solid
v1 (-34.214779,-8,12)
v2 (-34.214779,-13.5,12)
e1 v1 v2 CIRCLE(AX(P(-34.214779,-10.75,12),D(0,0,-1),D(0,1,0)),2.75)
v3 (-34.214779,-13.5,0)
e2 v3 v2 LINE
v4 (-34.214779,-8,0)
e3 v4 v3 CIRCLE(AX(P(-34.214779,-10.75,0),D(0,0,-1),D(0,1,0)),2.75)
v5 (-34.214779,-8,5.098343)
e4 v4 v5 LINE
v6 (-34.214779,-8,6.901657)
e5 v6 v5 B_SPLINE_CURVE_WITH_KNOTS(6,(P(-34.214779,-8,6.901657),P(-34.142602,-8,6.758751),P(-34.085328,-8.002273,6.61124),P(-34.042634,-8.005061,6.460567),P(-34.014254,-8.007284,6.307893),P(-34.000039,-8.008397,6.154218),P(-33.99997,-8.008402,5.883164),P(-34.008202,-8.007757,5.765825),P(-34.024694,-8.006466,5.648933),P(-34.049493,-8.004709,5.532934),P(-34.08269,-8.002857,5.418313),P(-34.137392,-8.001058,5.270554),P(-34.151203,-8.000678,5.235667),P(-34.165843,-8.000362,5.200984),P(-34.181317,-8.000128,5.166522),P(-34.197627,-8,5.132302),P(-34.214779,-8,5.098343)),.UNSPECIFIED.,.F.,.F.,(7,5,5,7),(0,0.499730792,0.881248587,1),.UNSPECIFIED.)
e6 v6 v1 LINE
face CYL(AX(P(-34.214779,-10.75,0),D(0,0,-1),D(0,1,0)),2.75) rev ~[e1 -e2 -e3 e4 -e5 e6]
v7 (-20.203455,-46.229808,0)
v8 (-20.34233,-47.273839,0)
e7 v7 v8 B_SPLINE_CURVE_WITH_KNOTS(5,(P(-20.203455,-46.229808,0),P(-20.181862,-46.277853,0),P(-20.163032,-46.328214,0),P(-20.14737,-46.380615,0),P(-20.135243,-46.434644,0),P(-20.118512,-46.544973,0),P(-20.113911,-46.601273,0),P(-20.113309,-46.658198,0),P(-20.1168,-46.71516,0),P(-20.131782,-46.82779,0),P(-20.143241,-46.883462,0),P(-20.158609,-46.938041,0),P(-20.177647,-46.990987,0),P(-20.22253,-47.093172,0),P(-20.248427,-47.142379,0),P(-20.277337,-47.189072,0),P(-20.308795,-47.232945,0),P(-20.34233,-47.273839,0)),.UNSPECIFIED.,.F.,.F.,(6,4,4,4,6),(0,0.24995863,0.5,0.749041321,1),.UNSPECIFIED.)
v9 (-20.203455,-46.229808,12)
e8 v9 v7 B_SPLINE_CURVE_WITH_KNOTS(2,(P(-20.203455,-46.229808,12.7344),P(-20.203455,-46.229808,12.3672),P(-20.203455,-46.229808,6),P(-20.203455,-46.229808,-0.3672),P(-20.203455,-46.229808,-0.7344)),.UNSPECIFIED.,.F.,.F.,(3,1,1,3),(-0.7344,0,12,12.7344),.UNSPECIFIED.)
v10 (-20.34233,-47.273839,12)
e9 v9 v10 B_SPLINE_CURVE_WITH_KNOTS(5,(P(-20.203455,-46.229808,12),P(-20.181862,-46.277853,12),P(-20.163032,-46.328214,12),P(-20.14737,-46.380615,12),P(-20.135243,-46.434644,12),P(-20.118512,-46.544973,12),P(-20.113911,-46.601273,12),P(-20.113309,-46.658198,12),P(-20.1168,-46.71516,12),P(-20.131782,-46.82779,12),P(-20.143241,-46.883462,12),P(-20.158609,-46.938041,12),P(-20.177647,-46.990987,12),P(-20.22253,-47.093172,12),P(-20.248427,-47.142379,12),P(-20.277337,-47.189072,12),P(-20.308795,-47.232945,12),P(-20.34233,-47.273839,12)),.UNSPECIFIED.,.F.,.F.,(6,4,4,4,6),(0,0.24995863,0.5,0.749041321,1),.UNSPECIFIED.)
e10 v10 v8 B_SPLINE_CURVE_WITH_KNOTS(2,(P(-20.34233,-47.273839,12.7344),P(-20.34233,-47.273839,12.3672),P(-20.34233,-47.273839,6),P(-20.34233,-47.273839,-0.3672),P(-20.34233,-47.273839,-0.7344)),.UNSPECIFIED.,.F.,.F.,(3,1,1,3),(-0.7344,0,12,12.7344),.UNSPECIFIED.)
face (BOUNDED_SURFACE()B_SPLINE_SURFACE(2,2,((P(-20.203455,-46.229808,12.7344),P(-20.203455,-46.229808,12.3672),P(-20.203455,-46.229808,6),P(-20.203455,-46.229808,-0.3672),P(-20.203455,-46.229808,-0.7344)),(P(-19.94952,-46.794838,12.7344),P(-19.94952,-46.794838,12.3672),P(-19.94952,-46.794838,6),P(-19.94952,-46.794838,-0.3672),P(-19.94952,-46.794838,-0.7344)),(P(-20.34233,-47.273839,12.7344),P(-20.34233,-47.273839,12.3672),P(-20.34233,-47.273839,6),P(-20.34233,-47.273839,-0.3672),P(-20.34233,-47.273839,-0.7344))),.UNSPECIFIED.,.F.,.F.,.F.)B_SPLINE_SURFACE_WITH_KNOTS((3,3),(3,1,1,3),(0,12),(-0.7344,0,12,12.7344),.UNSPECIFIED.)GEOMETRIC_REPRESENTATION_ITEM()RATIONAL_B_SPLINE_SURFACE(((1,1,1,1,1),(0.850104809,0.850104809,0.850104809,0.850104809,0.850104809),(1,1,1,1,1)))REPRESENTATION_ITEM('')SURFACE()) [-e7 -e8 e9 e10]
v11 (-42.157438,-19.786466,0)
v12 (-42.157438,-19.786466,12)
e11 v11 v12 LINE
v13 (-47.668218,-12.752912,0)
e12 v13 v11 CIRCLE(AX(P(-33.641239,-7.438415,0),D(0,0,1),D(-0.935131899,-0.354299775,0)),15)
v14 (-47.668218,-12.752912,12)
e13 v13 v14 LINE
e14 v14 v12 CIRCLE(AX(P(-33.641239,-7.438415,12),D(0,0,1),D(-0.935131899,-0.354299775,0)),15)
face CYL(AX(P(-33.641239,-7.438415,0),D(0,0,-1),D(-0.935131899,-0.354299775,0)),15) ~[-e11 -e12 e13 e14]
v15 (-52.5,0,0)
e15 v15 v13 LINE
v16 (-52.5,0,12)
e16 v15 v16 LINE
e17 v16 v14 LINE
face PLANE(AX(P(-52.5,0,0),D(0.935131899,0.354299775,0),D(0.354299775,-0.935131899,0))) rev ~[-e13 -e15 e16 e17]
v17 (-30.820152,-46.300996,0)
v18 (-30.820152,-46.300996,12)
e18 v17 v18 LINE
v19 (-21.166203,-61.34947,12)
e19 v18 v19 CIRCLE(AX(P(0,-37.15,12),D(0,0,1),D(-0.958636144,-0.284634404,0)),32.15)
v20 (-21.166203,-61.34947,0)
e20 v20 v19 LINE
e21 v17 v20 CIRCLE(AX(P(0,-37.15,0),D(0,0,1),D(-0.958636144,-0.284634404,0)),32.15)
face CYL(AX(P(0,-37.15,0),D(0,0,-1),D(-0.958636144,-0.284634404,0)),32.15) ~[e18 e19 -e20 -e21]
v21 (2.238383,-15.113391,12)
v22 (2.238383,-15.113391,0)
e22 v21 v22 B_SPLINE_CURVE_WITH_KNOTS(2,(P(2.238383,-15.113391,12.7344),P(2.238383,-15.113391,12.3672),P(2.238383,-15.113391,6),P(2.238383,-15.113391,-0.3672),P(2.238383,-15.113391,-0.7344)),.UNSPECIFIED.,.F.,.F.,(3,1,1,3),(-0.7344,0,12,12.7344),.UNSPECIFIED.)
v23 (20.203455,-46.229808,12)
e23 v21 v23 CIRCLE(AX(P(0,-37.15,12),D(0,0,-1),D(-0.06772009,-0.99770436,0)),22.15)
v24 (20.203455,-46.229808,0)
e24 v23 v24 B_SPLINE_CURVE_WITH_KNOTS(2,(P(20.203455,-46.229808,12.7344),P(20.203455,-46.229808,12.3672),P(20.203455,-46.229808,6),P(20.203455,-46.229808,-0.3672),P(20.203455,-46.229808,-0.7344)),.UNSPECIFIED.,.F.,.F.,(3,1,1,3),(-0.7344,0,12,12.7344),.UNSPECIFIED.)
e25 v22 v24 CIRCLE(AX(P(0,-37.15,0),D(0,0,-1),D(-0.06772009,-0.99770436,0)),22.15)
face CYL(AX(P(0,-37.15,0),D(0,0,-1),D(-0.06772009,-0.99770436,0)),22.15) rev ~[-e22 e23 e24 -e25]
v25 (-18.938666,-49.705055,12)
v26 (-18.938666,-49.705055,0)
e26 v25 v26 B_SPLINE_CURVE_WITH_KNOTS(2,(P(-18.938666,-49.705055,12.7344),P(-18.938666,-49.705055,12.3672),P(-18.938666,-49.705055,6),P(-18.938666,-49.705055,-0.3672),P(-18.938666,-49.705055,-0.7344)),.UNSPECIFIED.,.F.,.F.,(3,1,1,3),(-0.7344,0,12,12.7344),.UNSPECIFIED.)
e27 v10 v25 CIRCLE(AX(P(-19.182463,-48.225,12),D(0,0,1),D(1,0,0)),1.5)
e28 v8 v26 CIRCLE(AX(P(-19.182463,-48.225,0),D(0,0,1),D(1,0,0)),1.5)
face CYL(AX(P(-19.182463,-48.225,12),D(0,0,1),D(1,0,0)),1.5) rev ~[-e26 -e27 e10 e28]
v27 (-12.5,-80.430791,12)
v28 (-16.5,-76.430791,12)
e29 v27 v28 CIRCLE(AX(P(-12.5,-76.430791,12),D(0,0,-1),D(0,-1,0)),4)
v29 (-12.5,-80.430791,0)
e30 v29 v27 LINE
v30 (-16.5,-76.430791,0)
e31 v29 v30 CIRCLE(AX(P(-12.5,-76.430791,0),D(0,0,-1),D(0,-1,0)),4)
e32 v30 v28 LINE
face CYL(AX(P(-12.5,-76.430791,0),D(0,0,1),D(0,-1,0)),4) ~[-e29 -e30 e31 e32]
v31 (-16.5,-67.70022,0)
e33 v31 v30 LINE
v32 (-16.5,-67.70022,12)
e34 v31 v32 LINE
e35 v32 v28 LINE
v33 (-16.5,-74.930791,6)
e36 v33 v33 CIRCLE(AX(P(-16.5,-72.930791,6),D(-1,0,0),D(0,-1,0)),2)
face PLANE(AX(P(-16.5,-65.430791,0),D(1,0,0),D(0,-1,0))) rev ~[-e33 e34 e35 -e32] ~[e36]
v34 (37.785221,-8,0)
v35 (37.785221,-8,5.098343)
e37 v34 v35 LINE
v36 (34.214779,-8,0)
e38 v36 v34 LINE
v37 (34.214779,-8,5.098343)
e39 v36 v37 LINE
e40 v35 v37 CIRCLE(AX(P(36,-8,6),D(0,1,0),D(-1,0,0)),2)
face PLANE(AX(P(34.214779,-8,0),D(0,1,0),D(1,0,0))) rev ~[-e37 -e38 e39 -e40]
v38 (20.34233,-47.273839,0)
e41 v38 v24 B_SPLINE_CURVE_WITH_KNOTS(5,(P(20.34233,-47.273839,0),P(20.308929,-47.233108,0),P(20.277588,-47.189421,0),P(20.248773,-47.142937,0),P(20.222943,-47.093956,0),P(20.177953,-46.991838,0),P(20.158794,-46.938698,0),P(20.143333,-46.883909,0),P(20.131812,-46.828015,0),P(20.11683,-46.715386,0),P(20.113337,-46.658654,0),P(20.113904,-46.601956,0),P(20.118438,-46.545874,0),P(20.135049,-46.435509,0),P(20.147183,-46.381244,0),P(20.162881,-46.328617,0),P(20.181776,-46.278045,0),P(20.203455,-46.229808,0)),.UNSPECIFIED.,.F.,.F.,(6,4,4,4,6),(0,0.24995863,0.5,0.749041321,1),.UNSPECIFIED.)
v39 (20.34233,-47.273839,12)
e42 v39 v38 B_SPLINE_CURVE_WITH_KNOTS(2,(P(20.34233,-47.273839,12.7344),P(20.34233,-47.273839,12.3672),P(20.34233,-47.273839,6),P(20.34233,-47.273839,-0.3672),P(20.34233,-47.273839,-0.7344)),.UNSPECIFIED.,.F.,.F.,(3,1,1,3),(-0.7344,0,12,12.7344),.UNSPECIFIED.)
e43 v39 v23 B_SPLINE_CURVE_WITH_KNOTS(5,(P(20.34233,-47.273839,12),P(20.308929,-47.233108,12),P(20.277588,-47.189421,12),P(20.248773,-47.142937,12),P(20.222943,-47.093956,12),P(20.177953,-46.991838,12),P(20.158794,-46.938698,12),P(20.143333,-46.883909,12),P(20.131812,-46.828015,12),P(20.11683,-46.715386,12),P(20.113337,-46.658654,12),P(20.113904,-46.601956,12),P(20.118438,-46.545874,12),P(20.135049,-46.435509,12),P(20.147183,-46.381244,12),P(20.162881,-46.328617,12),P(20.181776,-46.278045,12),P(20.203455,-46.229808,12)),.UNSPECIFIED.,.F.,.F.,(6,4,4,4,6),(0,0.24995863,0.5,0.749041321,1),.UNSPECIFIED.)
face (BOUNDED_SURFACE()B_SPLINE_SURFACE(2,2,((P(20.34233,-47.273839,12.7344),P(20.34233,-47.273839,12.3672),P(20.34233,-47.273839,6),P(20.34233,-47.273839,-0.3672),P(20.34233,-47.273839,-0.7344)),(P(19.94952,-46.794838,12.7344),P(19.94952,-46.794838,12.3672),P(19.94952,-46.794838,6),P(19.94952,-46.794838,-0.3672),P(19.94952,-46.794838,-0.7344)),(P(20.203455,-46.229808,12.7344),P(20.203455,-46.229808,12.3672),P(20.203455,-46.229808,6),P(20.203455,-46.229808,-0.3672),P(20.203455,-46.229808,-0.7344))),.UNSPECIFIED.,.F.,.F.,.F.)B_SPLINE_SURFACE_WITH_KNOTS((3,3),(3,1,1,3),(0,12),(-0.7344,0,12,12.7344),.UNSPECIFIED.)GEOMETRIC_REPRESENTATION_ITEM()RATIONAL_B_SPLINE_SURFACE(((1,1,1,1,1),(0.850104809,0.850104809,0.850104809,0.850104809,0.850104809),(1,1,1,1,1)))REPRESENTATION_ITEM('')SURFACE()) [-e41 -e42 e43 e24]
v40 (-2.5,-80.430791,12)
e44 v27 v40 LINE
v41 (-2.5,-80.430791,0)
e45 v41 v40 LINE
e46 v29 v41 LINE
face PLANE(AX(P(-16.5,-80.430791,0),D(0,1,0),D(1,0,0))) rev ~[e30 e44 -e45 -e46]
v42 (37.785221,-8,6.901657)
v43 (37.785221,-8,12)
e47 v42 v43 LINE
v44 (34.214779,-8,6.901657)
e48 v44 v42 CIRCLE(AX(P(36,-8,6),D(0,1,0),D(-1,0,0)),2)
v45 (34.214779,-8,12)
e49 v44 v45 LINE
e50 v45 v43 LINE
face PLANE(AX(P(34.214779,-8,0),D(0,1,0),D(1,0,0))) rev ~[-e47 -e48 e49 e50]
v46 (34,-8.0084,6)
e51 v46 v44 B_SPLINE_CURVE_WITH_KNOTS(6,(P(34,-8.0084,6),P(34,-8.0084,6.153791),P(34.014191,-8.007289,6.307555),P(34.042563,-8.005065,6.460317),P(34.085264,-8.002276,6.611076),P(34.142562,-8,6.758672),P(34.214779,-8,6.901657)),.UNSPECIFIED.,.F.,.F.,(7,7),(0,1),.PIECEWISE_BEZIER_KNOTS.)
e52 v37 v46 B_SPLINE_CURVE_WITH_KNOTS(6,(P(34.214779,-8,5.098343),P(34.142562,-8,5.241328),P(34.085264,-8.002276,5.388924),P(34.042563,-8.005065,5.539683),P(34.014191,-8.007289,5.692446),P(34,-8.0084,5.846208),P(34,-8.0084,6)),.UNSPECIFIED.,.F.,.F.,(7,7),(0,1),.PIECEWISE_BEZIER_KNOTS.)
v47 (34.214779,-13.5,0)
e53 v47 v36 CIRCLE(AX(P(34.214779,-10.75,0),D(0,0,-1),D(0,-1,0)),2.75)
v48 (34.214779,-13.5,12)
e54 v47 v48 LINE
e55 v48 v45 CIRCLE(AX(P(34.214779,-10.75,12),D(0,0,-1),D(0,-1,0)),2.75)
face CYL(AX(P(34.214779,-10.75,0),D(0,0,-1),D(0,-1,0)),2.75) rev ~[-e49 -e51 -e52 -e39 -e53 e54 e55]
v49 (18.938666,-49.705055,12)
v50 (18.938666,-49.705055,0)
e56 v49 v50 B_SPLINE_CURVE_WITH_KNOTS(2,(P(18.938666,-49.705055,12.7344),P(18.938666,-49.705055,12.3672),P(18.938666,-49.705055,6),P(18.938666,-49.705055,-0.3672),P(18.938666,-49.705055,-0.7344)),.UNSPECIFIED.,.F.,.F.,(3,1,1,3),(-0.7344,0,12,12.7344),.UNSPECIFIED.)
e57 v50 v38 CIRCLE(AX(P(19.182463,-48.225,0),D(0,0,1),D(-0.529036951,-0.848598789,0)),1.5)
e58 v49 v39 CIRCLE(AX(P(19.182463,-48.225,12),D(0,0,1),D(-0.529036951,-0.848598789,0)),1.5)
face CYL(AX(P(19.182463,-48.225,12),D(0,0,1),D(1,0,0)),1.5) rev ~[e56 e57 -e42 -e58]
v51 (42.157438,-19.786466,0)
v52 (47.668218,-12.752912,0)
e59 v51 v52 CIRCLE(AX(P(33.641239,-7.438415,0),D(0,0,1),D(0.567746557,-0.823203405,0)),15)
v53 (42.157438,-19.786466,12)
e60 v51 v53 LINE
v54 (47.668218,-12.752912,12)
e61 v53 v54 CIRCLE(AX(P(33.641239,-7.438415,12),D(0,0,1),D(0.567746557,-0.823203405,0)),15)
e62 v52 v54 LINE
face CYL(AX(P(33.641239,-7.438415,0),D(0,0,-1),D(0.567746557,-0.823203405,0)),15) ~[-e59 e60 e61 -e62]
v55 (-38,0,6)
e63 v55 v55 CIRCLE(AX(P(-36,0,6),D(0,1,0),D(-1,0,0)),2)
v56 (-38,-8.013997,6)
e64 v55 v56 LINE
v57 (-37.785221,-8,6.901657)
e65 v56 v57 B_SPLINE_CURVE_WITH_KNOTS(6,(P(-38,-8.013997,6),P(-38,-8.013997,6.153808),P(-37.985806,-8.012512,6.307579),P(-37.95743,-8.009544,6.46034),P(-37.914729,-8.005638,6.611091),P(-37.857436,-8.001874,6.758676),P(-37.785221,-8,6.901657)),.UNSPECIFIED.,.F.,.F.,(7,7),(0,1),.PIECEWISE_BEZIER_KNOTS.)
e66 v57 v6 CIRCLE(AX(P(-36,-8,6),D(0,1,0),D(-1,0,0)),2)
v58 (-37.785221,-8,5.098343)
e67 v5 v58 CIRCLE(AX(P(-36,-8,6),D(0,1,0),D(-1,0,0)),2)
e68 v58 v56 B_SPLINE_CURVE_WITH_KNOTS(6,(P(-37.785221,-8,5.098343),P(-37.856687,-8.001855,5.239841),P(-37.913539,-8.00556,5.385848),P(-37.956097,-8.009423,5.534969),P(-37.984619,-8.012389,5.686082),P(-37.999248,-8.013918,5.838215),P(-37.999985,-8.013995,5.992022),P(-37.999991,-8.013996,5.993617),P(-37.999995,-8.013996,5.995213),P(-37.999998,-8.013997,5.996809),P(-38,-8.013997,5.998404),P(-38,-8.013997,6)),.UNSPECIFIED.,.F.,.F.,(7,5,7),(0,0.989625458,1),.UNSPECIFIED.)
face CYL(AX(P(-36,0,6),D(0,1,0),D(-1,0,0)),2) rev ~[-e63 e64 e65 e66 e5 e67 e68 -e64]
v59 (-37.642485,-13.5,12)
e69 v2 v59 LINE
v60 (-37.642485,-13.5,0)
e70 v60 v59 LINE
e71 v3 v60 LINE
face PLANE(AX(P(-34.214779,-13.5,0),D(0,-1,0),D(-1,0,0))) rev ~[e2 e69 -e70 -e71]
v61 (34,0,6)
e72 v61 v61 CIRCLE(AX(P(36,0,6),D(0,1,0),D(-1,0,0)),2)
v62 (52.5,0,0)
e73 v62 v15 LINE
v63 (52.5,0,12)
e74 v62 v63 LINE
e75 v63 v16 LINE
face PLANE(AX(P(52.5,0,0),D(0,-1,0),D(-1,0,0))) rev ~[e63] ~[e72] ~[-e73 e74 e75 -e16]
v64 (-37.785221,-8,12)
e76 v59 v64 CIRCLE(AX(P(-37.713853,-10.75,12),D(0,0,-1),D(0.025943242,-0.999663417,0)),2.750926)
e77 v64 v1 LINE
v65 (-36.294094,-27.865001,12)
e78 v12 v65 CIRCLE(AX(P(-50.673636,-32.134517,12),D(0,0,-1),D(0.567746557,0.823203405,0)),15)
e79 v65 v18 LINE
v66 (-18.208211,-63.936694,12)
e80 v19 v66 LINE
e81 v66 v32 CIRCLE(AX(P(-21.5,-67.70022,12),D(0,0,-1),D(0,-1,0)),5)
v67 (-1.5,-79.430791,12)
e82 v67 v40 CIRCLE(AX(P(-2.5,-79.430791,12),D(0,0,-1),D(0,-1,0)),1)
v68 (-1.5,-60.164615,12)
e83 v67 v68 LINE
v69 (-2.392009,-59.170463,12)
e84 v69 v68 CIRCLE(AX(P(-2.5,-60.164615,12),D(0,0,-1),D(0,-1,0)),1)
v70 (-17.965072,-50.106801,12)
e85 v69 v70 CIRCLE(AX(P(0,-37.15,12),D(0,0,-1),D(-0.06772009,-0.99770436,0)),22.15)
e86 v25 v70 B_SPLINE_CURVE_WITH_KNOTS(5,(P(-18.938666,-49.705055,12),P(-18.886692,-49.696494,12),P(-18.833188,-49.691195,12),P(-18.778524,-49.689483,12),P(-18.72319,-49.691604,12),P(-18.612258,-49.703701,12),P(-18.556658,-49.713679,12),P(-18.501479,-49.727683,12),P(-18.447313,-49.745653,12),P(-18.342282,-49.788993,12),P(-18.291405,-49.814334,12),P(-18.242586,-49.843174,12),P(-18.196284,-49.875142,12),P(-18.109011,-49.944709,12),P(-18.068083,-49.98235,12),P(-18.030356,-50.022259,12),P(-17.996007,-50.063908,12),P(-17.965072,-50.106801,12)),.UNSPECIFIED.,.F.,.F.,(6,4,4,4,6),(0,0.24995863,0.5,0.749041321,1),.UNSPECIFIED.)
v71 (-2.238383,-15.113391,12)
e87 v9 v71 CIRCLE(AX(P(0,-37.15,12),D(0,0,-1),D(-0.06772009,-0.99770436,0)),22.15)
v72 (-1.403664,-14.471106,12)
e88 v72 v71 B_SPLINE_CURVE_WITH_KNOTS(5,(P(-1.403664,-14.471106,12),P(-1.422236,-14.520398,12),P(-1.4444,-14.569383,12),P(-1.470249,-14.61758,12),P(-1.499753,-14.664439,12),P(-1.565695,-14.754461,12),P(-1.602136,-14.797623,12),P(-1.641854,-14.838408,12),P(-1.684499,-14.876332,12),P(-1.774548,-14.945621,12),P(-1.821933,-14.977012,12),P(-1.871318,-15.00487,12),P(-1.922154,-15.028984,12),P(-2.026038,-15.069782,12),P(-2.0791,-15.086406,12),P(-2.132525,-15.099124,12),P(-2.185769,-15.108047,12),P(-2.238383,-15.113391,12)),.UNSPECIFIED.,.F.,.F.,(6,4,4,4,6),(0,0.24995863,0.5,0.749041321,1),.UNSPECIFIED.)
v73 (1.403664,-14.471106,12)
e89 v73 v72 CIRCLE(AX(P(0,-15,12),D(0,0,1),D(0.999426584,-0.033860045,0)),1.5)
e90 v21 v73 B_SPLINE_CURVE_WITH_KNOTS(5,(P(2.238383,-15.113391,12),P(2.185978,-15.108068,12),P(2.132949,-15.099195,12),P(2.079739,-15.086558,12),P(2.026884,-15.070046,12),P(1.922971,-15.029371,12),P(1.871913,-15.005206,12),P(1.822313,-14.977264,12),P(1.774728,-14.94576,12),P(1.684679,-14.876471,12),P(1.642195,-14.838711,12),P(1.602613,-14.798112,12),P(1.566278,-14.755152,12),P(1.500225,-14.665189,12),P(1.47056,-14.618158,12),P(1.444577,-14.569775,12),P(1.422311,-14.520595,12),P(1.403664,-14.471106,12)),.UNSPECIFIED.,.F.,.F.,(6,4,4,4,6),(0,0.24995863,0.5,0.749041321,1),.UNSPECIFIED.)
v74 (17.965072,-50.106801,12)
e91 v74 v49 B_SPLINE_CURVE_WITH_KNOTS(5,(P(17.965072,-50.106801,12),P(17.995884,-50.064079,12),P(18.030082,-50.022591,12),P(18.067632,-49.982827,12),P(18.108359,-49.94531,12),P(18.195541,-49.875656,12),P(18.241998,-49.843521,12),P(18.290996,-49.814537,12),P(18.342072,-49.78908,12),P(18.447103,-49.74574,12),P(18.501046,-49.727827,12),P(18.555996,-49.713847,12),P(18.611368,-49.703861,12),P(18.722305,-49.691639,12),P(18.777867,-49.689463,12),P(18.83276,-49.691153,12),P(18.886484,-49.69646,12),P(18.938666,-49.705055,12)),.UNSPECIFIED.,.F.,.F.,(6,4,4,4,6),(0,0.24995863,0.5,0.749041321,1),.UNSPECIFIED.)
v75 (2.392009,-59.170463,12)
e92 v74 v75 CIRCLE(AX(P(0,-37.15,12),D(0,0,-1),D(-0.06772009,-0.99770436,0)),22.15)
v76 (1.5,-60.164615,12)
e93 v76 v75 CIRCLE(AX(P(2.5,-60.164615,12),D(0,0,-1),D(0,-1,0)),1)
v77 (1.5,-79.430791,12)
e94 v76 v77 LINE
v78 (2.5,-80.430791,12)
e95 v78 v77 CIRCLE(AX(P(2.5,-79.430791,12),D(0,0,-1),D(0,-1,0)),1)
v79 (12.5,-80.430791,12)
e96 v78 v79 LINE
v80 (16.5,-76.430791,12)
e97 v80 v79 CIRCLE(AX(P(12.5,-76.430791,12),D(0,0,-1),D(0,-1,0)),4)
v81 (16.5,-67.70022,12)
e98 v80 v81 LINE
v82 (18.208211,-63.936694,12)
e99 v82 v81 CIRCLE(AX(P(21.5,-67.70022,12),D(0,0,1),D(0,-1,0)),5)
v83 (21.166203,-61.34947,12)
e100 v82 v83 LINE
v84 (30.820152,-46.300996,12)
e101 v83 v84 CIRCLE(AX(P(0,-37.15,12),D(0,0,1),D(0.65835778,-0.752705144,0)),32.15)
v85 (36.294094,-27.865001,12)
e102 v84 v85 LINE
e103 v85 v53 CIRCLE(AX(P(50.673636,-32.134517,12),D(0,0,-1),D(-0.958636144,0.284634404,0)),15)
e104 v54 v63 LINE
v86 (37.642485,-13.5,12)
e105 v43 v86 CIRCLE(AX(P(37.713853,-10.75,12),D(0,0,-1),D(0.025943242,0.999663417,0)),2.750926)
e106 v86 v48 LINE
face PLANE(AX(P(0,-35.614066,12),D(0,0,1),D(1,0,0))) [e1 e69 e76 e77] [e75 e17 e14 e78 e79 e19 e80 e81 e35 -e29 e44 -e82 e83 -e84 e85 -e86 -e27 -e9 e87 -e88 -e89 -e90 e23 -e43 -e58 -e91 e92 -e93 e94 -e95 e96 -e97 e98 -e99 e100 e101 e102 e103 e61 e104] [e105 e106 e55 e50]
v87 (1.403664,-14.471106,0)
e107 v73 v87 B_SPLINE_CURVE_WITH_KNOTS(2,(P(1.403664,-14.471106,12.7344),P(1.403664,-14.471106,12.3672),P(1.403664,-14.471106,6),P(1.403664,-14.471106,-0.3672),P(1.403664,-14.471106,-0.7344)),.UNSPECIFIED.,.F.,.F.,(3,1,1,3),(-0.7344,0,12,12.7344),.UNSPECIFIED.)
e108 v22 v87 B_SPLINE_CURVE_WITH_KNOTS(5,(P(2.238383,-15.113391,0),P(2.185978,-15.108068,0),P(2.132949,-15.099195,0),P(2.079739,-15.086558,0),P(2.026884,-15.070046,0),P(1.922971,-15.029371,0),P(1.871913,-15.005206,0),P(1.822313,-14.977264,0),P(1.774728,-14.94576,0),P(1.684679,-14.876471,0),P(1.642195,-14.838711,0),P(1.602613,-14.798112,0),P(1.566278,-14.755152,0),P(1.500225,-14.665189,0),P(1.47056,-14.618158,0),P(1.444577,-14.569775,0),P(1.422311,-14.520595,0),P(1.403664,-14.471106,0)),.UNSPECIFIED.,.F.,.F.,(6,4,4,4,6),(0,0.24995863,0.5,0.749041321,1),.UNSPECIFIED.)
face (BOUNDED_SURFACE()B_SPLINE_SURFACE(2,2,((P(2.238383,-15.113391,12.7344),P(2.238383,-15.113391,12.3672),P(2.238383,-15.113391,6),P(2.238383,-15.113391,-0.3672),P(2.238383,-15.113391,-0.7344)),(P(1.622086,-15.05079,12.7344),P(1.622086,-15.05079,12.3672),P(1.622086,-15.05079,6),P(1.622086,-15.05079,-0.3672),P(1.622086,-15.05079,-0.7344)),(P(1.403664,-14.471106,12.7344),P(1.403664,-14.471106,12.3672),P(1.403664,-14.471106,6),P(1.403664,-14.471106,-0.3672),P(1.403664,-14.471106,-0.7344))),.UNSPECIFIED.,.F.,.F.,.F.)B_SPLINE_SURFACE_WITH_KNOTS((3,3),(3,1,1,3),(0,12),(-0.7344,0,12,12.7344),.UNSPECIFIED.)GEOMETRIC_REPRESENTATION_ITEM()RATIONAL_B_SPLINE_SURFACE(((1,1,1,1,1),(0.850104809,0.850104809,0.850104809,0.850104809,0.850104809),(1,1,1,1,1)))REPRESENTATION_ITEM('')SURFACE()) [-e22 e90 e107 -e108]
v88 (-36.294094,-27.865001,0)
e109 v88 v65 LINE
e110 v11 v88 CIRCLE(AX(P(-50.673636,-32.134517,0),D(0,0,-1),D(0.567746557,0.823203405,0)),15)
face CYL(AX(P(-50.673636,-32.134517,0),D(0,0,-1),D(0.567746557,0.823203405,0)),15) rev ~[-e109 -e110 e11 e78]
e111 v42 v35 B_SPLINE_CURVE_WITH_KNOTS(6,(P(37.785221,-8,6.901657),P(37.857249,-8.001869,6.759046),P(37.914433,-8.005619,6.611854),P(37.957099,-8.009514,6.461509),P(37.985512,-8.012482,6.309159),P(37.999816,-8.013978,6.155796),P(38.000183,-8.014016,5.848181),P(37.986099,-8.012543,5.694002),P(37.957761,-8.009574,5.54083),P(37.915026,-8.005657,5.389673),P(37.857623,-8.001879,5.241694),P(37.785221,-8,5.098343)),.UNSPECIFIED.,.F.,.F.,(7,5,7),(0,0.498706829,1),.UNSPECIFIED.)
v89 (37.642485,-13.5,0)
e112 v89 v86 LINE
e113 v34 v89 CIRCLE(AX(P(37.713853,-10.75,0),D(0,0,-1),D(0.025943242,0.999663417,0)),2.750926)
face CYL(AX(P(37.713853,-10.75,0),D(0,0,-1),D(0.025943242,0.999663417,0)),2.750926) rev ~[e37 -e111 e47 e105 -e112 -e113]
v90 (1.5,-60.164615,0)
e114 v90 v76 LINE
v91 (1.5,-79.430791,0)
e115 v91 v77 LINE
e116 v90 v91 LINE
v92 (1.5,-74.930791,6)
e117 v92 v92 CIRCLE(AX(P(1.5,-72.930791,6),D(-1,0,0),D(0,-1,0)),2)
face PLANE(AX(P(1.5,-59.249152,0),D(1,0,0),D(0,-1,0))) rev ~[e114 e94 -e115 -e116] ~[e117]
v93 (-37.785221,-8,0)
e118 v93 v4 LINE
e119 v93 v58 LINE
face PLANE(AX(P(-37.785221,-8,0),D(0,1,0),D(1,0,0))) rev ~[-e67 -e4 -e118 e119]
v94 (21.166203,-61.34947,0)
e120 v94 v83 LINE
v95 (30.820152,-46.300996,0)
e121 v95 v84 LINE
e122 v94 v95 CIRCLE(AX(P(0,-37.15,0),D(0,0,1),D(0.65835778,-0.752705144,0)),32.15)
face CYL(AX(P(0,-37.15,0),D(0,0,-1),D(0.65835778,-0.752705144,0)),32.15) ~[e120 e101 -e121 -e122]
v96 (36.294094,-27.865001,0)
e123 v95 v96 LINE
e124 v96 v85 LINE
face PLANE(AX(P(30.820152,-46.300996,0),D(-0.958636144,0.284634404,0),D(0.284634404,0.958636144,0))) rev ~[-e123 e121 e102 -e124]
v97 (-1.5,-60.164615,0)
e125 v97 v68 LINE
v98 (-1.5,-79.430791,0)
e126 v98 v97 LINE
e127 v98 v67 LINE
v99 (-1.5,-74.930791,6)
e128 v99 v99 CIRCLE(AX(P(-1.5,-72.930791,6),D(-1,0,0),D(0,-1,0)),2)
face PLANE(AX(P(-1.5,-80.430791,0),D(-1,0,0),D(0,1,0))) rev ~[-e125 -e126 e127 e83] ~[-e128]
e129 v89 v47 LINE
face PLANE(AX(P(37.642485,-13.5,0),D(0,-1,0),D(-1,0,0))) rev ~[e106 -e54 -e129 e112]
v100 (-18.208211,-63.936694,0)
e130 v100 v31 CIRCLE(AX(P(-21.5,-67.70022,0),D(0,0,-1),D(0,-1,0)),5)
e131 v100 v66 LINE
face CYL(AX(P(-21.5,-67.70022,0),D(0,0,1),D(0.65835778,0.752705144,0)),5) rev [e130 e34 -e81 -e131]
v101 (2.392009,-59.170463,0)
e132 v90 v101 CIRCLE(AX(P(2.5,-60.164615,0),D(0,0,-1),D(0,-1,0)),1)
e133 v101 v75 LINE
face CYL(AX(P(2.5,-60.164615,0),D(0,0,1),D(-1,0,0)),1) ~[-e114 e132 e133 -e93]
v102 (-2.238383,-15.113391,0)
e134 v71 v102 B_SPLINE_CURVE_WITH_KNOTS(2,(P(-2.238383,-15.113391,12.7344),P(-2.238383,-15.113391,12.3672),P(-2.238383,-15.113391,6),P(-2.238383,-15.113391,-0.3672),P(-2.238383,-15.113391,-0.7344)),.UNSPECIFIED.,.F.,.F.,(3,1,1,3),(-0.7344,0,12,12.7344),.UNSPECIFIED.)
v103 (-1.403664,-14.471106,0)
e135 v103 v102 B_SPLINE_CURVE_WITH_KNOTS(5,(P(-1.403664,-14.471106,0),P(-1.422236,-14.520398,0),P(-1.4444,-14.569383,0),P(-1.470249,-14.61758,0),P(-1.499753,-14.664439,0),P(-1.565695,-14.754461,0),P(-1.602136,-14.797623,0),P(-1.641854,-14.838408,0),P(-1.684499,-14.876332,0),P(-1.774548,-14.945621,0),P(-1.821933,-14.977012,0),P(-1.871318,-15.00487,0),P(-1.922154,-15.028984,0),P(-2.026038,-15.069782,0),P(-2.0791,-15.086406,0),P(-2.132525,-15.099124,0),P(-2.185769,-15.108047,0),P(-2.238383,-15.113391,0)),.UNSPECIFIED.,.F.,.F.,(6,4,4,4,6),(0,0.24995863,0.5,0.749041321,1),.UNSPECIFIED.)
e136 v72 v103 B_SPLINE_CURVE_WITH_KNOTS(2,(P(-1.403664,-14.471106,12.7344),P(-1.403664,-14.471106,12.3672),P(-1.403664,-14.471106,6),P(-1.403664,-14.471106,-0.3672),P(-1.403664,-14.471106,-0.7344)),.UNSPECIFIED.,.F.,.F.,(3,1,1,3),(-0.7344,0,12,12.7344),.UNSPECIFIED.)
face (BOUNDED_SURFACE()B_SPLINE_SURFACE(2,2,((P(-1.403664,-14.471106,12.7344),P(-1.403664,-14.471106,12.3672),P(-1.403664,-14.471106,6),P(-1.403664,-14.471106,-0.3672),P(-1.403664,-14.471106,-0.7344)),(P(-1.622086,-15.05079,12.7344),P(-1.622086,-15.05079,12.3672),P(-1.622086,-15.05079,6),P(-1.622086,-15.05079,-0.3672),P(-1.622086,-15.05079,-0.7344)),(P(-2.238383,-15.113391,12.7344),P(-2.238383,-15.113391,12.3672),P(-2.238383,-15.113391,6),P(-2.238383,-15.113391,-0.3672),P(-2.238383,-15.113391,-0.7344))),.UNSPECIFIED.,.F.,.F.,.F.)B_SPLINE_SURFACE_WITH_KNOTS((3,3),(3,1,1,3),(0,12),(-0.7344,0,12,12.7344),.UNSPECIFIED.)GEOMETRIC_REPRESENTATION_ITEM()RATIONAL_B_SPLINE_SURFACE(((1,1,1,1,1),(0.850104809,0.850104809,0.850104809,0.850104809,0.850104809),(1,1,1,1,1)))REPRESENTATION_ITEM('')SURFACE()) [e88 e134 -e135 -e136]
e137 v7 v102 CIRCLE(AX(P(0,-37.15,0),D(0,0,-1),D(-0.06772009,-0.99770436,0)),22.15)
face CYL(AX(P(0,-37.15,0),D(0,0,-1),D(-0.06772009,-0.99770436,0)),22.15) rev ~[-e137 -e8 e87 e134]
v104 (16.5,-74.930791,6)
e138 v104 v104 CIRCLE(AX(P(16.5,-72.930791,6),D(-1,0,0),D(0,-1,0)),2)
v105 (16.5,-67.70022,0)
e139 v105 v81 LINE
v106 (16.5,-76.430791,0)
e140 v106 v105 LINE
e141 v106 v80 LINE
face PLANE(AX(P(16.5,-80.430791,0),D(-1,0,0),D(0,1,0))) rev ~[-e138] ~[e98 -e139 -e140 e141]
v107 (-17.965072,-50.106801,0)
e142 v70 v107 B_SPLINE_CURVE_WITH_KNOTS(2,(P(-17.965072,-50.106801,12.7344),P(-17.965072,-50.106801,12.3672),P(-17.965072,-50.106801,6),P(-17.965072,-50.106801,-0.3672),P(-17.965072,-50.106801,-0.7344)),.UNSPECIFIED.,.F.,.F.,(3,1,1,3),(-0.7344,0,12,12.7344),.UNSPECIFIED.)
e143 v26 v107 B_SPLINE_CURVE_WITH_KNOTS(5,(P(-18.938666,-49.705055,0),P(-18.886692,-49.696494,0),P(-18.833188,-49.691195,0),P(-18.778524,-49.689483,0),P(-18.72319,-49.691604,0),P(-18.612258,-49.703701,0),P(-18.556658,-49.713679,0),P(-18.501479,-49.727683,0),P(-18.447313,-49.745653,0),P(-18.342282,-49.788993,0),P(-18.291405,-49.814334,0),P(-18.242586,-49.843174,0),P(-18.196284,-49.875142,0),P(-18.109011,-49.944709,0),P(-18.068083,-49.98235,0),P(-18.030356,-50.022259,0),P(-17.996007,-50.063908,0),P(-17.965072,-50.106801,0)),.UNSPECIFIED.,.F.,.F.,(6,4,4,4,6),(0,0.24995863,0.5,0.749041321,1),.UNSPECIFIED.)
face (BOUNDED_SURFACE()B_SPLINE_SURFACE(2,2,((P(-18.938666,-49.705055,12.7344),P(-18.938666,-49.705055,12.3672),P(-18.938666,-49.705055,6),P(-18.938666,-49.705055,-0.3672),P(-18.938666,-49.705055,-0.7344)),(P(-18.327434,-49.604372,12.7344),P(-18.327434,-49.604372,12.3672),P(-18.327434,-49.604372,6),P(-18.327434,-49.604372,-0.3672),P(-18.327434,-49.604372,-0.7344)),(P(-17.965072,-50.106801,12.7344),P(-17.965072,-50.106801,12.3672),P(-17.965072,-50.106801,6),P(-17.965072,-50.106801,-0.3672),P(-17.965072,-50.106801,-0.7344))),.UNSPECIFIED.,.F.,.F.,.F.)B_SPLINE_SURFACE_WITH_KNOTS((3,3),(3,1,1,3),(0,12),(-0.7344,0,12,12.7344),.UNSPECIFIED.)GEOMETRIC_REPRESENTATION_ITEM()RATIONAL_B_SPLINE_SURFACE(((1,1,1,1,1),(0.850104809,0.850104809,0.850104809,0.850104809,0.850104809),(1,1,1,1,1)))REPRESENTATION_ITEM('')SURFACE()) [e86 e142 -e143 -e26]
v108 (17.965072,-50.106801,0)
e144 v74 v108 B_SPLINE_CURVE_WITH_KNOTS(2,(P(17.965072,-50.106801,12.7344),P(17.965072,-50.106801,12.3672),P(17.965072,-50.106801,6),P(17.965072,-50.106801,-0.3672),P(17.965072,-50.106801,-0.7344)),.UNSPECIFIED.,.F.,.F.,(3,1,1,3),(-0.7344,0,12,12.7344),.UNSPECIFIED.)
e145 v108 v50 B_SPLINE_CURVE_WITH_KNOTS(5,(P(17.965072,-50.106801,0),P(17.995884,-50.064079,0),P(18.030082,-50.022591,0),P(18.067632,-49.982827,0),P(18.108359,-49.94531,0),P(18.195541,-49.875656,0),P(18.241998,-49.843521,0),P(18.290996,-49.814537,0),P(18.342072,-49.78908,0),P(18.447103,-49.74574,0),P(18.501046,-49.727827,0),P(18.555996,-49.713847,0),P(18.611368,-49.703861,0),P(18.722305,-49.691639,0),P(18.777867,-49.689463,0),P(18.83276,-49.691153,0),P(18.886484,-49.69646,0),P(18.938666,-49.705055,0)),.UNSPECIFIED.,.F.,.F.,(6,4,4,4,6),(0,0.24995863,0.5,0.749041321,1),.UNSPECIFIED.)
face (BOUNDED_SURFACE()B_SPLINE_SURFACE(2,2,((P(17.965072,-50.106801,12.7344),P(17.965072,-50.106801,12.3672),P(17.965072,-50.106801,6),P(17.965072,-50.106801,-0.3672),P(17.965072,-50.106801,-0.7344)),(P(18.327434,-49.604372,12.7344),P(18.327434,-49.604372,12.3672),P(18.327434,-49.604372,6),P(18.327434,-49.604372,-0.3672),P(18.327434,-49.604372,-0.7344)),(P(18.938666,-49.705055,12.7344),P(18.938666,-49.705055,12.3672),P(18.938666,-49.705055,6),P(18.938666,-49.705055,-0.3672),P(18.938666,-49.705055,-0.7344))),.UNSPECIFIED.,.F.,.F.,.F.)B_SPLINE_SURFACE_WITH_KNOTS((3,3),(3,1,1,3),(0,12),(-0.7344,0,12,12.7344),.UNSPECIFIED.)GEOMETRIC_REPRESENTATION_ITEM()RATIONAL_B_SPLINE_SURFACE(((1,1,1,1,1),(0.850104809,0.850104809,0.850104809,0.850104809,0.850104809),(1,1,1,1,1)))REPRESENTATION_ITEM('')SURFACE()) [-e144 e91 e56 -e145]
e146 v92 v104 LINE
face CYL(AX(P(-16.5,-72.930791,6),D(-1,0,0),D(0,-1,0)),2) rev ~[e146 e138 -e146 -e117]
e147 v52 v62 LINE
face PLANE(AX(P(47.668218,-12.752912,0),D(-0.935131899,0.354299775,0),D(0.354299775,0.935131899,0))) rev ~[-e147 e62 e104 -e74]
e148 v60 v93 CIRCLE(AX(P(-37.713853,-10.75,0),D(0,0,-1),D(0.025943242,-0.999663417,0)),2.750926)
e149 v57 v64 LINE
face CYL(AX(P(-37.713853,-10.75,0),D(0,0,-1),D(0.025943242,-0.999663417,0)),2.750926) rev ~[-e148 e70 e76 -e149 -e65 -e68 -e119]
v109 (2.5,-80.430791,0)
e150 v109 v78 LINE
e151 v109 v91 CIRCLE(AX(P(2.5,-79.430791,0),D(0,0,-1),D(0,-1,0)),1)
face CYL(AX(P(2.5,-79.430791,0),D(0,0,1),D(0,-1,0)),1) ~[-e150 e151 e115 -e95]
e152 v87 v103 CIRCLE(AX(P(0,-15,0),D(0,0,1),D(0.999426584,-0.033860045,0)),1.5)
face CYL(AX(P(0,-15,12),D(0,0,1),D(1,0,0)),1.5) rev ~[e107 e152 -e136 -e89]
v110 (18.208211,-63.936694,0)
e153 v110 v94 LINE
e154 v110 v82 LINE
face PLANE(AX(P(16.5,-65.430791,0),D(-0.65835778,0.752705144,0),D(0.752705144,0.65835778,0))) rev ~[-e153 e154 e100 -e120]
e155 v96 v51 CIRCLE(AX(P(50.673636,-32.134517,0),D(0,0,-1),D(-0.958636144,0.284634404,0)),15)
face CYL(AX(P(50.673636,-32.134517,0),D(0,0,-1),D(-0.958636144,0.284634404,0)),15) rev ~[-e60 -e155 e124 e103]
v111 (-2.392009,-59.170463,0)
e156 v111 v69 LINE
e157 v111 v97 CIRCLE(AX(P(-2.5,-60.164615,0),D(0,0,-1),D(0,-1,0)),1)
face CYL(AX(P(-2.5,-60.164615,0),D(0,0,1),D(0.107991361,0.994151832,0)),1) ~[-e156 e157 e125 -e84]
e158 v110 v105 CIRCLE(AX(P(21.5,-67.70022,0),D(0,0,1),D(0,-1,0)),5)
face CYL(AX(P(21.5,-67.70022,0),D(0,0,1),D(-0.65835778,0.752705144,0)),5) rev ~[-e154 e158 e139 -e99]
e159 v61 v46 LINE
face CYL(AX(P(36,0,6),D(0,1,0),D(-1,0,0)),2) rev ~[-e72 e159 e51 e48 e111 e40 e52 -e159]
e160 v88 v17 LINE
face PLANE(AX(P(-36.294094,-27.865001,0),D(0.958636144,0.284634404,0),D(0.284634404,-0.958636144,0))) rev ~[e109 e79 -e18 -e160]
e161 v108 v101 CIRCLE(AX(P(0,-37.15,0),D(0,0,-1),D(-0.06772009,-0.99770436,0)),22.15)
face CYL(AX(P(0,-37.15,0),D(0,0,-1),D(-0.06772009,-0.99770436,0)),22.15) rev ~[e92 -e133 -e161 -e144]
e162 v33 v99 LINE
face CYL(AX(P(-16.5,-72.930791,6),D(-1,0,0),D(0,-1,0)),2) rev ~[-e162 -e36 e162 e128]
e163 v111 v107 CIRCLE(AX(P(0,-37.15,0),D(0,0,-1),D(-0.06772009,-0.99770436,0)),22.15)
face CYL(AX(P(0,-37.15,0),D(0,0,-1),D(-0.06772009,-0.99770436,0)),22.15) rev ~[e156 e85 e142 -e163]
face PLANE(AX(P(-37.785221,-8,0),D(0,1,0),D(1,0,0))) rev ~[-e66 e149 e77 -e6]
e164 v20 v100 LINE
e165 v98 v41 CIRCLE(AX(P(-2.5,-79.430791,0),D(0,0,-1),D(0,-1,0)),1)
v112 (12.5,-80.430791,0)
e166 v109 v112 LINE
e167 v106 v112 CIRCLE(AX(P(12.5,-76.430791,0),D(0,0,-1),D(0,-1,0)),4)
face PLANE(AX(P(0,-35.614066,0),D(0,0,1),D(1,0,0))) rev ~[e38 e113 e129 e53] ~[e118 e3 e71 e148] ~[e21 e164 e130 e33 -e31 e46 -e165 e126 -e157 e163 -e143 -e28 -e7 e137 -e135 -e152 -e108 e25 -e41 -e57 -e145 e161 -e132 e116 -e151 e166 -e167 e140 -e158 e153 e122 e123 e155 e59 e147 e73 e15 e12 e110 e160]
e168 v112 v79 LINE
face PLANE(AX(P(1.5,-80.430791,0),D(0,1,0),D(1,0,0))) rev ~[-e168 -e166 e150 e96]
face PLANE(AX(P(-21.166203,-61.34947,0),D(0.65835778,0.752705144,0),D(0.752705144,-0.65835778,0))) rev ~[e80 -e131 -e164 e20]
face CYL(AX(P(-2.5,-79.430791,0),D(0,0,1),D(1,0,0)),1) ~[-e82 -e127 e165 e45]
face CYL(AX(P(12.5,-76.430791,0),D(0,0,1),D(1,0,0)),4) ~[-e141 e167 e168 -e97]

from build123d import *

# Parameters (mm, degrees)
F1_DEPTH = 12
F2_R     = 5
F3_R     = 2
F4_DEPTH = 69.001
F5_R     = 4
F6_R     = 2
F7_DEPTH = 12
F8_R     = 1.5
F9_DEPTH = 25
F10_R    = 1


with BuildPart() as f1:
    # F0 (on Top) → F1 (new body)
    with BuildSketch(Plane.XY):
        with BuildLine():
            Line((52.5, 0), (-52.5, 0))
            Line((-52.5, 0), (-47.6682177495, -12.7529115916))
            ThreePointArc((-47.6682177495, -12.7529115916), (-45.4487126417, -16.689553935), (-42.1574376197, -19.7864660409))
            ThreePointArc((-42.1574376197, -19.7864660409), (-38.5340554499, -23.3236951077), (-36.2940938248, -27.8650010584))
            Line((-36.2940938248, -27.8650010584), (-30.8201520188, -46.3009960956))
            ThreePointArc((-30.8201520188, -46.3009960956), (-27.0602921577, -54.5098124511), (-21.1662026167, -61.3494703824))
            Line((-21.1662026167, -61.3494703824), (-16.5, -65.4307906954))
            Line((-16.5, -65.4307906954), (-16.5, -80.4307906954))
            Line((-16.5, -80.4307906954), (-1.5, -80.4307906954))
            Line((-1.5, -80.4307906954), (-1.5, -59.2491515674))
            ThreePointArc((-1.5, -59.2491515674), (0, -15), (1.5, -59.2491515674))
            Line((1.5, -59.2491515674), (1.5, -80.4307906954))
            Line((1.5, -80.4307906954), (16.5, -80.4307906954))
            Line((16.5, -80.4307906954), (16.5, -65.4307906954))
            Line((16.5, -65.4307906954), (21.1662026167, -61.3494703824))
            ThreePointArc((21.1662026167, -61.3494703824), (27.0602921577, -54.5098124511), (30.8201520188, -46.3009960956))
            Line((30.8201520188, -46.3009960956), (36.2940938248, -27.8650010584))
            ThreePointArc((36.2940938248, -27.8650010584), (38.5340554499, -23.3236951077), (42.1574376197, -19.7864660409))
            ThreePointArc((42.1574376197, -19.7864660409), (45.4487126417, -16.689553935), (47.6682177495, -12.7529115916))
            Line((47.6682177495, -12.7529115916), (52.5, 0))
        make_face()
        with BuildLine():
            Line((-34.2147789885, -13.5), (-37.6424851382, -13.5))
            ThreePointArc((-37.6424851382, -13.5), (-40.4638530749, -10.8213679366), (-37.7852210115, -8))
            Line((-37.7852210115, -8), (-34.2147789885, -8))
            ThreePointArc((-34.2147789885, -8), (-31.4647789885, -10.75), (-34.2147789885, -13.5))
        make_face(mode=Mode.SUBTRACT)
        with BuildLine():
            ThreePointArc((37.7852210115, -8), (40.4638530749, -10.8213679366), (37.6424851382, -13.5))
            Line((37.6424851382, -13.5), (34.2147789885, -13.5))
            ThreePointArc((34.2147789885, -13.5), (31.4647789885, -10.75), (34.2147789885, -8))
            Line((34.2147789885, -8), (37.7852210115, -8))
        make_face(mode=Mode.SUBTRACT)
    extrude(amount=F1_DEPTH)

    # F2
    f2_edges = [f1.edges().sort_by_distance(p)[0] for p in [
        (-16.5, -65.430791, 6),
        (16.5, -65.430791, 6),
    ]]
    fillet(f2_edges, radius=F2_R)

    # F3 (on face) → F4 (cut, through all)
    with BuildSketch(Plane(origin=(-16.5, 0, 0), x_dir=(0, -1, 0), z_dir=(-1, 0, 0))):
        with Locations((72.9307906954, 6)):
            Circle(F3_R)
    extrude(amount=-F4_DEPTH, mode=Mode.SUBTRACT)

    # F5
    f5_edges = [f1.edges().sort_by_distance(p)[0] for p in [
        (-16.5, -80.430791, 6),
        (16.5, -80.430791, 6),
    ]]
    fillet(f5_edges, radius=F5_R)

    # F6 (on face) → F7 (cut)
    with BuildSketch(Plane(origin=(0, 0, 0), x_dir=(-1, 0, 0), z_dir=(0, 1, 0))):
        with Locations((-36, 6)):
            Circle(F6_R)
        with Locations((36, 6)):
            Circle(F6_R)
    extrude(amount=-F7_DEPTH, mode=Mode.SUBTRACT)

    # F8 (on face) → F9 (cut)
    with BuildSketch(Plane.XY.offset(12)):
        with Locations((0, -15)):
            Circle(F8_R)
        with Locations((-19.1824626938, -48.225)):
            Circle(F8_R)
        with Locations((19.1824626938, -48.225)):
            Circle(F8_R)
    extrude(amount=-F9_DEPTH, mode=Mode.SUBTRACT)

    # F10
    f10_edges = [f1.edges().sort_by_distance(p)[0] for p in [
        (1.49914, -15.05079, 6),
        (-1.49914, -15.05079, 6),
        (-19.888047, -46.901312, 6),
        (-18.388907, -49.497898, 6),
        (18.388907, -49.497898, 6),
        (19.888047, -46.901312, 6),
        (1.5, -59.249152, 6),
        (-1.5, -59.249152, 6),
        (1.5, -80.430791, 6),
        (-1.5, -80.430791, 6),
    ]]
    fillet(f10_edges, radius=F10_R)


solid = f1.part
